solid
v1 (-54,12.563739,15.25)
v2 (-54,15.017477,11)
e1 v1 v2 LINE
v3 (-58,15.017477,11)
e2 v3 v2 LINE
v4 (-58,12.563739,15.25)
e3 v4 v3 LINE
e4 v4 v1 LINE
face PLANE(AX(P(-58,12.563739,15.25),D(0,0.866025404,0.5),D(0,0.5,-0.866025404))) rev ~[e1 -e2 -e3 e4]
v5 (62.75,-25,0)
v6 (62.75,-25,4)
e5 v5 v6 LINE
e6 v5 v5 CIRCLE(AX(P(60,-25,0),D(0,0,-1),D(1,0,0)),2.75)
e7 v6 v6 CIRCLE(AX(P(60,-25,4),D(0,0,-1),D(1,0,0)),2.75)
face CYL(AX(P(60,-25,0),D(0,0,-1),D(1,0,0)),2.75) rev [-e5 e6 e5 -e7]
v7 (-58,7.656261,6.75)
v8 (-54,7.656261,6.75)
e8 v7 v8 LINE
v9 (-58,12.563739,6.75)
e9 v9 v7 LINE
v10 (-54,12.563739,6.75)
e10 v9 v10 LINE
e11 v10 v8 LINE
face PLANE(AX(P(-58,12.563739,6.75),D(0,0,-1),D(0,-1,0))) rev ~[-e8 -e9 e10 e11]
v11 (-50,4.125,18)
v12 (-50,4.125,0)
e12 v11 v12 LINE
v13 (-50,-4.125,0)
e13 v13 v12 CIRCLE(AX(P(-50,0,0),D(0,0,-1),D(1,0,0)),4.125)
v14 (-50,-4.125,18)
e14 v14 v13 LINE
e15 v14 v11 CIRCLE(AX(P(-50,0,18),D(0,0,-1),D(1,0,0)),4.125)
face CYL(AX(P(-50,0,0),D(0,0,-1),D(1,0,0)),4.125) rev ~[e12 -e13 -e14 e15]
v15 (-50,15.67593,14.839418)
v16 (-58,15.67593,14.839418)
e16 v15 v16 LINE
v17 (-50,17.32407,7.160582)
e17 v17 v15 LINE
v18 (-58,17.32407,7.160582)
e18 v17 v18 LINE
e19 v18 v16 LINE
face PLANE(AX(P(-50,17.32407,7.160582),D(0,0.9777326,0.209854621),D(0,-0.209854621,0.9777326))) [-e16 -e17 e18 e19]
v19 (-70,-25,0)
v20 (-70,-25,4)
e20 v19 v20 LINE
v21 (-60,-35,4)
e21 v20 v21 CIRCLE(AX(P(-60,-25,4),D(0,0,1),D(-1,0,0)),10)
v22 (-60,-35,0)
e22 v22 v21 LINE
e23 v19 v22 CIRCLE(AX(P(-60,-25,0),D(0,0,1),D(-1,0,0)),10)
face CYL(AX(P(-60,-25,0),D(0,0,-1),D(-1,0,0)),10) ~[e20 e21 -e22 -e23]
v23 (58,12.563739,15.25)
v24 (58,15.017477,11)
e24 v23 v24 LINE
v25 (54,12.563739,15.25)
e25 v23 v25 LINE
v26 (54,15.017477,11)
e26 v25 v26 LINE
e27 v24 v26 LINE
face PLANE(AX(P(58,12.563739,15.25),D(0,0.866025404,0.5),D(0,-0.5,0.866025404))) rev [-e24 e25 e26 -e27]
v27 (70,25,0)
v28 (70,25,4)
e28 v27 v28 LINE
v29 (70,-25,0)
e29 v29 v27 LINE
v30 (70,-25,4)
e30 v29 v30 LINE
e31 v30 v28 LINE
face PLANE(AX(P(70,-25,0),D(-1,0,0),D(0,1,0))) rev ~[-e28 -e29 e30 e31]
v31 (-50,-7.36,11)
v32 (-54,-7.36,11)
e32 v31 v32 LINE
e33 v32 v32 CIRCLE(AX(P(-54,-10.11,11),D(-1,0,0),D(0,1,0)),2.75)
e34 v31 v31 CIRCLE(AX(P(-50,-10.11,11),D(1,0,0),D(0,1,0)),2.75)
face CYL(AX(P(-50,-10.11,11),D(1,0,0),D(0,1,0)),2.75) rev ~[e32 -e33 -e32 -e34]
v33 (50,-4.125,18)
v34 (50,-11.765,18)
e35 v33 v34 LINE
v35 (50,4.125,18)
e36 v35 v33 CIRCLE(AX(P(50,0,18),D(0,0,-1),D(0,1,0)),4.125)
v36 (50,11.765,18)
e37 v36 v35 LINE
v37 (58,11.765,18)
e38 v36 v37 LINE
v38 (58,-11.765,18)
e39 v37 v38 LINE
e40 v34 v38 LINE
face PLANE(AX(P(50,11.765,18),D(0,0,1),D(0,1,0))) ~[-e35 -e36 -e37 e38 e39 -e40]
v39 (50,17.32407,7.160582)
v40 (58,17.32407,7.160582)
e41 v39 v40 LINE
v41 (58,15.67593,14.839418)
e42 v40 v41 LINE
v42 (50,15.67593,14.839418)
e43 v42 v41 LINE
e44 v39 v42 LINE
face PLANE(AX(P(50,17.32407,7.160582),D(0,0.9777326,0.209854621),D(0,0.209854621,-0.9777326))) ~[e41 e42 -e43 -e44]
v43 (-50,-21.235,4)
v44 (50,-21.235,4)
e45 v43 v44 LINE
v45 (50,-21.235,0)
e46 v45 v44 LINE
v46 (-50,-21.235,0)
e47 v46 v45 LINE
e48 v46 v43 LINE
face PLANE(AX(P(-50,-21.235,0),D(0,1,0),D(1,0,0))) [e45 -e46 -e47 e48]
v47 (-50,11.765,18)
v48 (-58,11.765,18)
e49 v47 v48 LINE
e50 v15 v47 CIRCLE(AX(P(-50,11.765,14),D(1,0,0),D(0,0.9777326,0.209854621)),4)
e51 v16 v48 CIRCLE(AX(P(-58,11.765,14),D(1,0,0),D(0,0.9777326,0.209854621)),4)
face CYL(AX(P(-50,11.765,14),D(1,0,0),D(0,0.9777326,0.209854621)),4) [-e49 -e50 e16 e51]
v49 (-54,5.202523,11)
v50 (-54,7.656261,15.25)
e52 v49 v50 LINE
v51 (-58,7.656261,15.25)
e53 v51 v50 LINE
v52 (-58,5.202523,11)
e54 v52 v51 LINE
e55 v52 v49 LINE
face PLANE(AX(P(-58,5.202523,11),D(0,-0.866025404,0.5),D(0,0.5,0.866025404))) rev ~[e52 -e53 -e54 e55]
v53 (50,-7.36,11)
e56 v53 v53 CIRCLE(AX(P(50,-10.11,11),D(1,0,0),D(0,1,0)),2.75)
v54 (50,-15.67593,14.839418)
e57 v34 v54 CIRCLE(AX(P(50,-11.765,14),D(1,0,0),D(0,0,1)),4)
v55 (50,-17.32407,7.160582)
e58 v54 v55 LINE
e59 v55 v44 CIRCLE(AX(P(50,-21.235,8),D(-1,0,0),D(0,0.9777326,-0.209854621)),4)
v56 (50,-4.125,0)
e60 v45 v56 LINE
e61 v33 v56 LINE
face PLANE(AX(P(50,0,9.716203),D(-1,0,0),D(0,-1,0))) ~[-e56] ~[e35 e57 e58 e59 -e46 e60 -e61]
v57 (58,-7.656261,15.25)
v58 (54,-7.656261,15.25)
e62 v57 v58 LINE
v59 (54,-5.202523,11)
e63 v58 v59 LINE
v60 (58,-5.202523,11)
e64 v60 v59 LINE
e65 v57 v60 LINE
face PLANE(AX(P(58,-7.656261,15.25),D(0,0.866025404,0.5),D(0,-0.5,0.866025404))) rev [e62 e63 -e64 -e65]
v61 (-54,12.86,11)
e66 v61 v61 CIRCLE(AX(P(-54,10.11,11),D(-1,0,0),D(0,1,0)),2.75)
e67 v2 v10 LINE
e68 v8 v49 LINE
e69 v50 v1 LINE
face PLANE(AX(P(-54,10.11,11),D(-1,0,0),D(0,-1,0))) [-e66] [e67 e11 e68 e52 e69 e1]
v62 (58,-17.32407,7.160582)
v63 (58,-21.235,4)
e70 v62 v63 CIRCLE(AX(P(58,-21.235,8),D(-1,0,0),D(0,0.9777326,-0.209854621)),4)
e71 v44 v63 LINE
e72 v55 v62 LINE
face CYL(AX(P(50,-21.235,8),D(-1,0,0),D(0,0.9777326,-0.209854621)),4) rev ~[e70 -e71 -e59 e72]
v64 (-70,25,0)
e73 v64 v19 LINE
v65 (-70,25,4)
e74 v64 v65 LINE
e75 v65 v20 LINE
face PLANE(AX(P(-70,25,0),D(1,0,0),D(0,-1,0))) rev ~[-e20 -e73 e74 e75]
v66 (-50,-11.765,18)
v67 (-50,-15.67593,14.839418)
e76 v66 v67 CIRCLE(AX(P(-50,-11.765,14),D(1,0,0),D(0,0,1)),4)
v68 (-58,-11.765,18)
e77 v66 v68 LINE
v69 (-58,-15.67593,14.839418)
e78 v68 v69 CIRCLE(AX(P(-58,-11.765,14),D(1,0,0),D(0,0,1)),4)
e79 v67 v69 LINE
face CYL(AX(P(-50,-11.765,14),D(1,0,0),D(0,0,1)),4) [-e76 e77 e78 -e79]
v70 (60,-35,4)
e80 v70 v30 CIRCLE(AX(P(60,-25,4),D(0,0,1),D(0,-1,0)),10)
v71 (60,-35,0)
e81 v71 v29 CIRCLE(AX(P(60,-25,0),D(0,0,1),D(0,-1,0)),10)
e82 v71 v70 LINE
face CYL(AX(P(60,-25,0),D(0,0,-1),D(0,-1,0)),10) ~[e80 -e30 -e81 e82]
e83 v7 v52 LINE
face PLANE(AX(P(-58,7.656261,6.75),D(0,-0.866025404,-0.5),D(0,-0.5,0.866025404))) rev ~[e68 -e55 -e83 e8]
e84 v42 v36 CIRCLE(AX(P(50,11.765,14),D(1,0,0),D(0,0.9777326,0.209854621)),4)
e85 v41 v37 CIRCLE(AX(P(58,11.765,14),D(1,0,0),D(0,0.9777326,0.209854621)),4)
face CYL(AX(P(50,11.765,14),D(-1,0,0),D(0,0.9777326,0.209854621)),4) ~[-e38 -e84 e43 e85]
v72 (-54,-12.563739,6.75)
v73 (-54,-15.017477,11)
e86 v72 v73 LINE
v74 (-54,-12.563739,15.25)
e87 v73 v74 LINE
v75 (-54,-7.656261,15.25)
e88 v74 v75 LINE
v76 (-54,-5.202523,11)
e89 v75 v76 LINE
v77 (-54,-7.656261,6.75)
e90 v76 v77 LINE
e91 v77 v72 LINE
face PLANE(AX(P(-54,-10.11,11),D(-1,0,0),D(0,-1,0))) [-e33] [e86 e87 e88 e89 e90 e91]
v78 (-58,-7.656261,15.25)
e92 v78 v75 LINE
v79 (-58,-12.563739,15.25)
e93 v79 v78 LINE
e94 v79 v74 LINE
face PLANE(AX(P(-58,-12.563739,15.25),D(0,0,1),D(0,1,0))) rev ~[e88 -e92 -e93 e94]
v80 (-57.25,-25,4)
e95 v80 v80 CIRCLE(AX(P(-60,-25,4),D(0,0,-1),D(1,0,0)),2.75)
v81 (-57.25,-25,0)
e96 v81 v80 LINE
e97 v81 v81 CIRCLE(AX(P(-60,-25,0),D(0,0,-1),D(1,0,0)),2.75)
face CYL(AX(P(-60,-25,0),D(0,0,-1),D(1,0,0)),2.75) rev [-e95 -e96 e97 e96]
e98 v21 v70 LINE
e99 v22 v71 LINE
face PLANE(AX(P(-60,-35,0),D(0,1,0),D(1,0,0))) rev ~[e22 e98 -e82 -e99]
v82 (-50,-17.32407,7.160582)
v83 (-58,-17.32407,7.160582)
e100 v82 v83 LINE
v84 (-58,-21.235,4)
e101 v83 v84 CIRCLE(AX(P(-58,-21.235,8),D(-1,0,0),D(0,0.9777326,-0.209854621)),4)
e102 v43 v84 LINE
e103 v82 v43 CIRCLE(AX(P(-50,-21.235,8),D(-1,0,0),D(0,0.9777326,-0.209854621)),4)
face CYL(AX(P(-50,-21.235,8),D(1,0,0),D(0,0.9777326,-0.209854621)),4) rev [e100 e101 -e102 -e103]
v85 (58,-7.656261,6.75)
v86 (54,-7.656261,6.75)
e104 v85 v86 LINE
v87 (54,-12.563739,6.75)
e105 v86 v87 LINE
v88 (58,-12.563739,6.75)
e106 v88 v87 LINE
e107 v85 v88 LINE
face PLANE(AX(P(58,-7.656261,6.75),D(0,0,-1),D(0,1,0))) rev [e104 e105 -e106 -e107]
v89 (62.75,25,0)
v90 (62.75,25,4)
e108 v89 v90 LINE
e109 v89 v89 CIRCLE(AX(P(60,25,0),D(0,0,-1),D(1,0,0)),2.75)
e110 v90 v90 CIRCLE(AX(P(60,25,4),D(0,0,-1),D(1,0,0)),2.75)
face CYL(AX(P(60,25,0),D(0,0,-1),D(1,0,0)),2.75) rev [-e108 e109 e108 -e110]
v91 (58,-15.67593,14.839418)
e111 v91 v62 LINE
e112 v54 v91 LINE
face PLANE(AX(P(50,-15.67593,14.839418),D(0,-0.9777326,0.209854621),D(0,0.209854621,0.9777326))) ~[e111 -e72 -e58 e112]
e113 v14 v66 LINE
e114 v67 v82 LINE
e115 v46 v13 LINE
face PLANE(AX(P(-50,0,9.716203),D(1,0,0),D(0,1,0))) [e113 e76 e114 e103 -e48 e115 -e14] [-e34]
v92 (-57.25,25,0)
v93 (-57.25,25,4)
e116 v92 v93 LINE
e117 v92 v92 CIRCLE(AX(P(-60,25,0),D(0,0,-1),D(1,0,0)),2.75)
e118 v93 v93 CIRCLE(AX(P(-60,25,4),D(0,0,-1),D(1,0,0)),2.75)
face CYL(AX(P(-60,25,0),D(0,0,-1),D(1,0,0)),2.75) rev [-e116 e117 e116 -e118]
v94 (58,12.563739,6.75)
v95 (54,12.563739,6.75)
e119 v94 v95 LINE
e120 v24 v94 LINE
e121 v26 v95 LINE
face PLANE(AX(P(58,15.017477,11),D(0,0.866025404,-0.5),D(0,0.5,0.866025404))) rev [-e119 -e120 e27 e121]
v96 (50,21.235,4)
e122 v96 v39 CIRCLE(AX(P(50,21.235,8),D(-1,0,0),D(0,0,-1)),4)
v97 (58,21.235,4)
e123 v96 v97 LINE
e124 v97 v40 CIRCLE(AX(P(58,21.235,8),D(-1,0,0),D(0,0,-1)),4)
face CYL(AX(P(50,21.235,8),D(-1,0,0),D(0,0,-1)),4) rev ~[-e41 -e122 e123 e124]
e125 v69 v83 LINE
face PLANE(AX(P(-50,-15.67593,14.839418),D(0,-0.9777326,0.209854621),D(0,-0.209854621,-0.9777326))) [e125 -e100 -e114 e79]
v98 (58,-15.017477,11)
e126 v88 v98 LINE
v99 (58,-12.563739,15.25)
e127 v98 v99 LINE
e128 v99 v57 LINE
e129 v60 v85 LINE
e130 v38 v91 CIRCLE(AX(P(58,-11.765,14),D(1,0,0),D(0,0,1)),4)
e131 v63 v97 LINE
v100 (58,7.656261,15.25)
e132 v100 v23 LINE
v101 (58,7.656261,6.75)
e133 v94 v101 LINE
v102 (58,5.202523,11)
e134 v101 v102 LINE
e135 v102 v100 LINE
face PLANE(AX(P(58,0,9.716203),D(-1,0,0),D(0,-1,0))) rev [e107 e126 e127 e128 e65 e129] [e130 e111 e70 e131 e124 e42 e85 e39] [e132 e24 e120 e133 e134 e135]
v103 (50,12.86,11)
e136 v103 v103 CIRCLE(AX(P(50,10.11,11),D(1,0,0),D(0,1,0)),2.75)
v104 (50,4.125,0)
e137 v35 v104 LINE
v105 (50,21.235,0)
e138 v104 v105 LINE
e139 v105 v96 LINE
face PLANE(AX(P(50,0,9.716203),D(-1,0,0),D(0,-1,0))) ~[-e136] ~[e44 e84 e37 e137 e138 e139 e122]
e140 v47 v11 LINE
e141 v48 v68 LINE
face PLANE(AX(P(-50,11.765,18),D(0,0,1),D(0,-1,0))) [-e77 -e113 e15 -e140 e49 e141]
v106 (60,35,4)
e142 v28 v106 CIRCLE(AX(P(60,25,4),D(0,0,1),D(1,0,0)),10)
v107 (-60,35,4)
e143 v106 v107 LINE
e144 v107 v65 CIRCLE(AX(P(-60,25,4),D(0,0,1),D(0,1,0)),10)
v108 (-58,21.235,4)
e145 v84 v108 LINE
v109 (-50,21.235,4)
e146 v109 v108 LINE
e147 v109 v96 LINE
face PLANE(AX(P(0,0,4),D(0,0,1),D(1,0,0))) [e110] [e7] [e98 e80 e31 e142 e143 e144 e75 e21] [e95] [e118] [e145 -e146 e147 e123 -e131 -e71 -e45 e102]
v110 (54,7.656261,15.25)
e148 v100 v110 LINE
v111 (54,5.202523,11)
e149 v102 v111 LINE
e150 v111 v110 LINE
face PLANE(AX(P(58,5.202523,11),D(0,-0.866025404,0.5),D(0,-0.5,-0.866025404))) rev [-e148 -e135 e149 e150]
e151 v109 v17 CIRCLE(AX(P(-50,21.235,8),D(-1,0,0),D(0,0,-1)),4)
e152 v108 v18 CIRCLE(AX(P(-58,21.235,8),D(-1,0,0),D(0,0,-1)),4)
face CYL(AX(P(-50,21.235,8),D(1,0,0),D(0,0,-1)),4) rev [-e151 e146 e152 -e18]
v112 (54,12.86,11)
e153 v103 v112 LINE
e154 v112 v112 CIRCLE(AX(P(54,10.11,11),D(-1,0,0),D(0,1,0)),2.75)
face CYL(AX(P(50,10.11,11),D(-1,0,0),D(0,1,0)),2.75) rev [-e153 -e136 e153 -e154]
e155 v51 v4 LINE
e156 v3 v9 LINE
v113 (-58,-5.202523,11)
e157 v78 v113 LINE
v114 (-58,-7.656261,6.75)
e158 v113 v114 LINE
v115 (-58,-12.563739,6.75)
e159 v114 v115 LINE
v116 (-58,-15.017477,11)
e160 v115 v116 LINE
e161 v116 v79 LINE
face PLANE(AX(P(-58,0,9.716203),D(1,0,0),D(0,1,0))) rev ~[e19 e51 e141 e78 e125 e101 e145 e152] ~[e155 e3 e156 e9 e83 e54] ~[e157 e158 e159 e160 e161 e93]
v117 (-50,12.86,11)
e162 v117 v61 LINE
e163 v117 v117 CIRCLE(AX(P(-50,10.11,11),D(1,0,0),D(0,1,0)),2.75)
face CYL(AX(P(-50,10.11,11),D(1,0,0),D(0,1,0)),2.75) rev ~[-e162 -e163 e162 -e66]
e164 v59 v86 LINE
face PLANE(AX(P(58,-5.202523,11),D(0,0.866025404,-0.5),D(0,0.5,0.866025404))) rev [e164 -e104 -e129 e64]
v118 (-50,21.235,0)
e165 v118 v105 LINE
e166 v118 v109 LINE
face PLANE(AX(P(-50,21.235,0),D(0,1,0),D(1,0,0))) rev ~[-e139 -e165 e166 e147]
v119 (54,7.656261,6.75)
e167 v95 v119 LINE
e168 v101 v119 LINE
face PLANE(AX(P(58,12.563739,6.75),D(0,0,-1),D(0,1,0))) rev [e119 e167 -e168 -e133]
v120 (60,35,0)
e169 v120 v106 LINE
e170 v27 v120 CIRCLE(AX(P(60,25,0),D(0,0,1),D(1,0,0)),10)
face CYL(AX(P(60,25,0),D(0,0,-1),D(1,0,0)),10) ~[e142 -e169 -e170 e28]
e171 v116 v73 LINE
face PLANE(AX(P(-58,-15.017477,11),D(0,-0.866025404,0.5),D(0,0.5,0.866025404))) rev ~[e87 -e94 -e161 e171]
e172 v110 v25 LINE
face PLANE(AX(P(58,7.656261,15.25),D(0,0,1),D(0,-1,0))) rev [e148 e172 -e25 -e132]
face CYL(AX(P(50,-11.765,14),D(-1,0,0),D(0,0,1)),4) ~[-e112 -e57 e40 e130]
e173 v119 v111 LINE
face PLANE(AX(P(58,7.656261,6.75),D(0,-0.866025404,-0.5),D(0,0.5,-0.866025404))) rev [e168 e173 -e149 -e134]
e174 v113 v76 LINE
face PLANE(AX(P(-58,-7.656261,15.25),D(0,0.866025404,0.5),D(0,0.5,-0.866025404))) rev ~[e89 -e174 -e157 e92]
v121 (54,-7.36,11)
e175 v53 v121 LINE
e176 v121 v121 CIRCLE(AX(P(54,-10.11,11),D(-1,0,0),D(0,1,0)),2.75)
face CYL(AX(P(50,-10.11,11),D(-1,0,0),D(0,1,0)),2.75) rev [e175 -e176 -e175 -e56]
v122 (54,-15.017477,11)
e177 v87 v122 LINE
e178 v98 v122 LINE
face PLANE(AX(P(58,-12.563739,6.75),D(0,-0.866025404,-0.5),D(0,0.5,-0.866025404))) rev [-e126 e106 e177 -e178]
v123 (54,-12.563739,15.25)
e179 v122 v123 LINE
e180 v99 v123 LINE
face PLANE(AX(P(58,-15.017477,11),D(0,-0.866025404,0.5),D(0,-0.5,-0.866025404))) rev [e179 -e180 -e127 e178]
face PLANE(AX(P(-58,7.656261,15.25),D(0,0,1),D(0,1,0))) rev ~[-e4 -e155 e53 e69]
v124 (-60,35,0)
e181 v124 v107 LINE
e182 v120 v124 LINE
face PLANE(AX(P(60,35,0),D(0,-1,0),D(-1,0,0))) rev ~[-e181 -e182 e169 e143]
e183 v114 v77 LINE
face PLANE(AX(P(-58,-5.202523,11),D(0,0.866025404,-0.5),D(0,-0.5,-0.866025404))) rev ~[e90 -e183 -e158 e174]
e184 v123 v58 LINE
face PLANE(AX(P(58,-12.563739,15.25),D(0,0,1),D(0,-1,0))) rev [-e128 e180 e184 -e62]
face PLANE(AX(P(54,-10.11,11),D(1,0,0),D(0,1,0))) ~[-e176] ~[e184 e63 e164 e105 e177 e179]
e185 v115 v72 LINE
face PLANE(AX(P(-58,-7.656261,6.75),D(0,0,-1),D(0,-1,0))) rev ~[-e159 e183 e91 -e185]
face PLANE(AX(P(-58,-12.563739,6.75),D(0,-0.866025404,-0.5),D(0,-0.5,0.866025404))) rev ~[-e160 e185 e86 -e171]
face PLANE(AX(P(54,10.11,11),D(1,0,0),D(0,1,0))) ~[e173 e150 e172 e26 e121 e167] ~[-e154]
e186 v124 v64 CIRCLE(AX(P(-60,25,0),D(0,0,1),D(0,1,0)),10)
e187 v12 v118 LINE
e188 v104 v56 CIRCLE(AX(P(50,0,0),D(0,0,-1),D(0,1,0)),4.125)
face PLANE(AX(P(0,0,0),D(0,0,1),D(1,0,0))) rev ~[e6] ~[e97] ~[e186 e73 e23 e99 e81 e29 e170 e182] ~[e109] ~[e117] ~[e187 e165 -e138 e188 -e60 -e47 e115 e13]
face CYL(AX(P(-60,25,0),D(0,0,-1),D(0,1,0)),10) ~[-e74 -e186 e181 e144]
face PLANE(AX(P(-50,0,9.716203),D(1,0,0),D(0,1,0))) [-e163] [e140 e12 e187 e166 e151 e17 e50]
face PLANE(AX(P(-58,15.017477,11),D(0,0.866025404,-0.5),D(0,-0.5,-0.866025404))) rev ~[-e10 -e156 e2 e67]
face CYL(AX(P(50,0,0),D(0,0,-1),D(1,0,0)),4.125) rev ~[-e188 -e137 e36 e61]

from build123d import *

# Parameters (mm, degrees)
F0_R     = 2.75
F0_W     = 100
F0_H     = 42.47
F1_DEPTH = 4
F2_R     = 2.75
F3_DEPTH = 8
F4_R     = 2.75
F5_DEPTH = 4
F7_R     = 4.125
F8_DEPTH = 18.001


with BuildPart() as f1:
    # F0 (on Top) → F1 (new body)
    with BuildSketch(Plane.XY):
        with BuildLine():
            ThreePointArc((70, 25), (67.0710678119, 32.0710678119), (60, 35))
            Line((60, 35), (-60, 35))
            ThreePointArc((-60, 35), (-67.0710678119, 32.0710678119), (-70, 25))
            Line((-70, 25), (-70, -25))
            ThreePointArc((-70, -25), (-67.0710678119, -32.0710678119), (-60, -35))
            Line((-60, -35), (60, -35))
            ThreePointArc((60, -35), (67.0710678119, -32.0710678119), (70, -25))
            Line((70, -25), (70, 25))
        make_face()
        with Locations((-60, -25)):
            Circle(F0_R, mode=Mode.SUBTRACT)
        with Locations((60, -25)):
            Circle(F0_R, mode=Mode.SUBTRACT)
        with Locations((-60, 25)):
            Circle(F0_R, mode=Mode.SUBTRACT)
        Rectangle(F0_W, F0_H, mode=Mode.SUBTRACT)
        with Locations((60, 25)):
            Circle(F0_R, mode=Mode.SUBTRACT)
    extrude(amount=F1_DEPTH)

    # F2 (on face) → F3 (join)
    with BuildSketch(Plane.YZ.offset(-50)):
        with BuildLine():
            ThreePointArc((-17.3240695981, 7.1605815157), (-18.7208076781, 4.8889170746), (-21.235, 4))
            Line((-21.235, 4), (21.235, 4))
            ThreePointArc((21.235, 4), (18.7208076781, 4.8889170746), (17.3240695981, 7.1605815157))
            Line((17.3240695981, 7.1605815157), (15.6759304019, 14.8394184843))
            ThreePointArc((15.6759304019, 14.8394184843), (14.2791923219, 17.1110829254), (11.765, 18))
            Line((11.765, 18), (-11.765, 18))
            ThreePointArc((-11.765, 18), (-14.2791923219, 17.1110829254), (-15.6759304019, 14.8394184843))
            Line((-15.6759304019, 14.8394184843), (-17.3240695981, 7.1605815157))
        make_face()
        with Locations((-10.11, 11)):
            Circle(F2_R, mode=Mode.SUBTRACT)
        with Locations((10.11, 11)):
            Circle(F2_R, mode=Mode.SUBTRACT)
    extrude(amount=-F3_DEPTH)

    # F4 (on face) → F5 (cut)
    with BuildSketch(Plane(origin=(-58, 0, 0), x_dir=(0, -1, 0), z_dir=(-1, 0, 0))):
        Polygon((-5.2025227119, 11), (-7.6562613559, 15.25), (-12.5637386441, 15.25), (-15.0174772881, 11), (-12.5637386441, 6.75), (-7.6562613559, 6.75), align=None)
        with Locations((-10.11, 11)):
            Circle(F4_R, mode=Mode.SUBTRACT)
        Polygon((7.6562613559, 6.75), (12.5637386441, 6.75), (15.0174772881, 11), (12.5637386441, 15.25), (7.6562613559, 15.25), (5.2025227119, 11), align=None)
        with Locations((10.11, 11)):
            Circle(F4_R, mode=Mode.SUBTRACT)
    extrude(amount=-F5_DEPTH, mode=Mode.SUBTRACT)

    # F6: F1 across plane


with BuildPart() as f1_1:
    add(f1.part)
    add(f1.part.mirror(Plane.YZ))

    # F7 (on face) → F8 (cut, through all)
    with BuildSketch(Plane(origin=(0, 0, 0), x_dir=(1, 0, 0), z_dir=(0, 0, -1))):
        with Locations((-50, 0)):
            Circle(F7_R)
        with Locations((50, 0)):
            Circle(F7_R)
    extrude(amount=-F8_DEPTH, mode=Mode.SUBTRACT)


solid = f1_1.part
